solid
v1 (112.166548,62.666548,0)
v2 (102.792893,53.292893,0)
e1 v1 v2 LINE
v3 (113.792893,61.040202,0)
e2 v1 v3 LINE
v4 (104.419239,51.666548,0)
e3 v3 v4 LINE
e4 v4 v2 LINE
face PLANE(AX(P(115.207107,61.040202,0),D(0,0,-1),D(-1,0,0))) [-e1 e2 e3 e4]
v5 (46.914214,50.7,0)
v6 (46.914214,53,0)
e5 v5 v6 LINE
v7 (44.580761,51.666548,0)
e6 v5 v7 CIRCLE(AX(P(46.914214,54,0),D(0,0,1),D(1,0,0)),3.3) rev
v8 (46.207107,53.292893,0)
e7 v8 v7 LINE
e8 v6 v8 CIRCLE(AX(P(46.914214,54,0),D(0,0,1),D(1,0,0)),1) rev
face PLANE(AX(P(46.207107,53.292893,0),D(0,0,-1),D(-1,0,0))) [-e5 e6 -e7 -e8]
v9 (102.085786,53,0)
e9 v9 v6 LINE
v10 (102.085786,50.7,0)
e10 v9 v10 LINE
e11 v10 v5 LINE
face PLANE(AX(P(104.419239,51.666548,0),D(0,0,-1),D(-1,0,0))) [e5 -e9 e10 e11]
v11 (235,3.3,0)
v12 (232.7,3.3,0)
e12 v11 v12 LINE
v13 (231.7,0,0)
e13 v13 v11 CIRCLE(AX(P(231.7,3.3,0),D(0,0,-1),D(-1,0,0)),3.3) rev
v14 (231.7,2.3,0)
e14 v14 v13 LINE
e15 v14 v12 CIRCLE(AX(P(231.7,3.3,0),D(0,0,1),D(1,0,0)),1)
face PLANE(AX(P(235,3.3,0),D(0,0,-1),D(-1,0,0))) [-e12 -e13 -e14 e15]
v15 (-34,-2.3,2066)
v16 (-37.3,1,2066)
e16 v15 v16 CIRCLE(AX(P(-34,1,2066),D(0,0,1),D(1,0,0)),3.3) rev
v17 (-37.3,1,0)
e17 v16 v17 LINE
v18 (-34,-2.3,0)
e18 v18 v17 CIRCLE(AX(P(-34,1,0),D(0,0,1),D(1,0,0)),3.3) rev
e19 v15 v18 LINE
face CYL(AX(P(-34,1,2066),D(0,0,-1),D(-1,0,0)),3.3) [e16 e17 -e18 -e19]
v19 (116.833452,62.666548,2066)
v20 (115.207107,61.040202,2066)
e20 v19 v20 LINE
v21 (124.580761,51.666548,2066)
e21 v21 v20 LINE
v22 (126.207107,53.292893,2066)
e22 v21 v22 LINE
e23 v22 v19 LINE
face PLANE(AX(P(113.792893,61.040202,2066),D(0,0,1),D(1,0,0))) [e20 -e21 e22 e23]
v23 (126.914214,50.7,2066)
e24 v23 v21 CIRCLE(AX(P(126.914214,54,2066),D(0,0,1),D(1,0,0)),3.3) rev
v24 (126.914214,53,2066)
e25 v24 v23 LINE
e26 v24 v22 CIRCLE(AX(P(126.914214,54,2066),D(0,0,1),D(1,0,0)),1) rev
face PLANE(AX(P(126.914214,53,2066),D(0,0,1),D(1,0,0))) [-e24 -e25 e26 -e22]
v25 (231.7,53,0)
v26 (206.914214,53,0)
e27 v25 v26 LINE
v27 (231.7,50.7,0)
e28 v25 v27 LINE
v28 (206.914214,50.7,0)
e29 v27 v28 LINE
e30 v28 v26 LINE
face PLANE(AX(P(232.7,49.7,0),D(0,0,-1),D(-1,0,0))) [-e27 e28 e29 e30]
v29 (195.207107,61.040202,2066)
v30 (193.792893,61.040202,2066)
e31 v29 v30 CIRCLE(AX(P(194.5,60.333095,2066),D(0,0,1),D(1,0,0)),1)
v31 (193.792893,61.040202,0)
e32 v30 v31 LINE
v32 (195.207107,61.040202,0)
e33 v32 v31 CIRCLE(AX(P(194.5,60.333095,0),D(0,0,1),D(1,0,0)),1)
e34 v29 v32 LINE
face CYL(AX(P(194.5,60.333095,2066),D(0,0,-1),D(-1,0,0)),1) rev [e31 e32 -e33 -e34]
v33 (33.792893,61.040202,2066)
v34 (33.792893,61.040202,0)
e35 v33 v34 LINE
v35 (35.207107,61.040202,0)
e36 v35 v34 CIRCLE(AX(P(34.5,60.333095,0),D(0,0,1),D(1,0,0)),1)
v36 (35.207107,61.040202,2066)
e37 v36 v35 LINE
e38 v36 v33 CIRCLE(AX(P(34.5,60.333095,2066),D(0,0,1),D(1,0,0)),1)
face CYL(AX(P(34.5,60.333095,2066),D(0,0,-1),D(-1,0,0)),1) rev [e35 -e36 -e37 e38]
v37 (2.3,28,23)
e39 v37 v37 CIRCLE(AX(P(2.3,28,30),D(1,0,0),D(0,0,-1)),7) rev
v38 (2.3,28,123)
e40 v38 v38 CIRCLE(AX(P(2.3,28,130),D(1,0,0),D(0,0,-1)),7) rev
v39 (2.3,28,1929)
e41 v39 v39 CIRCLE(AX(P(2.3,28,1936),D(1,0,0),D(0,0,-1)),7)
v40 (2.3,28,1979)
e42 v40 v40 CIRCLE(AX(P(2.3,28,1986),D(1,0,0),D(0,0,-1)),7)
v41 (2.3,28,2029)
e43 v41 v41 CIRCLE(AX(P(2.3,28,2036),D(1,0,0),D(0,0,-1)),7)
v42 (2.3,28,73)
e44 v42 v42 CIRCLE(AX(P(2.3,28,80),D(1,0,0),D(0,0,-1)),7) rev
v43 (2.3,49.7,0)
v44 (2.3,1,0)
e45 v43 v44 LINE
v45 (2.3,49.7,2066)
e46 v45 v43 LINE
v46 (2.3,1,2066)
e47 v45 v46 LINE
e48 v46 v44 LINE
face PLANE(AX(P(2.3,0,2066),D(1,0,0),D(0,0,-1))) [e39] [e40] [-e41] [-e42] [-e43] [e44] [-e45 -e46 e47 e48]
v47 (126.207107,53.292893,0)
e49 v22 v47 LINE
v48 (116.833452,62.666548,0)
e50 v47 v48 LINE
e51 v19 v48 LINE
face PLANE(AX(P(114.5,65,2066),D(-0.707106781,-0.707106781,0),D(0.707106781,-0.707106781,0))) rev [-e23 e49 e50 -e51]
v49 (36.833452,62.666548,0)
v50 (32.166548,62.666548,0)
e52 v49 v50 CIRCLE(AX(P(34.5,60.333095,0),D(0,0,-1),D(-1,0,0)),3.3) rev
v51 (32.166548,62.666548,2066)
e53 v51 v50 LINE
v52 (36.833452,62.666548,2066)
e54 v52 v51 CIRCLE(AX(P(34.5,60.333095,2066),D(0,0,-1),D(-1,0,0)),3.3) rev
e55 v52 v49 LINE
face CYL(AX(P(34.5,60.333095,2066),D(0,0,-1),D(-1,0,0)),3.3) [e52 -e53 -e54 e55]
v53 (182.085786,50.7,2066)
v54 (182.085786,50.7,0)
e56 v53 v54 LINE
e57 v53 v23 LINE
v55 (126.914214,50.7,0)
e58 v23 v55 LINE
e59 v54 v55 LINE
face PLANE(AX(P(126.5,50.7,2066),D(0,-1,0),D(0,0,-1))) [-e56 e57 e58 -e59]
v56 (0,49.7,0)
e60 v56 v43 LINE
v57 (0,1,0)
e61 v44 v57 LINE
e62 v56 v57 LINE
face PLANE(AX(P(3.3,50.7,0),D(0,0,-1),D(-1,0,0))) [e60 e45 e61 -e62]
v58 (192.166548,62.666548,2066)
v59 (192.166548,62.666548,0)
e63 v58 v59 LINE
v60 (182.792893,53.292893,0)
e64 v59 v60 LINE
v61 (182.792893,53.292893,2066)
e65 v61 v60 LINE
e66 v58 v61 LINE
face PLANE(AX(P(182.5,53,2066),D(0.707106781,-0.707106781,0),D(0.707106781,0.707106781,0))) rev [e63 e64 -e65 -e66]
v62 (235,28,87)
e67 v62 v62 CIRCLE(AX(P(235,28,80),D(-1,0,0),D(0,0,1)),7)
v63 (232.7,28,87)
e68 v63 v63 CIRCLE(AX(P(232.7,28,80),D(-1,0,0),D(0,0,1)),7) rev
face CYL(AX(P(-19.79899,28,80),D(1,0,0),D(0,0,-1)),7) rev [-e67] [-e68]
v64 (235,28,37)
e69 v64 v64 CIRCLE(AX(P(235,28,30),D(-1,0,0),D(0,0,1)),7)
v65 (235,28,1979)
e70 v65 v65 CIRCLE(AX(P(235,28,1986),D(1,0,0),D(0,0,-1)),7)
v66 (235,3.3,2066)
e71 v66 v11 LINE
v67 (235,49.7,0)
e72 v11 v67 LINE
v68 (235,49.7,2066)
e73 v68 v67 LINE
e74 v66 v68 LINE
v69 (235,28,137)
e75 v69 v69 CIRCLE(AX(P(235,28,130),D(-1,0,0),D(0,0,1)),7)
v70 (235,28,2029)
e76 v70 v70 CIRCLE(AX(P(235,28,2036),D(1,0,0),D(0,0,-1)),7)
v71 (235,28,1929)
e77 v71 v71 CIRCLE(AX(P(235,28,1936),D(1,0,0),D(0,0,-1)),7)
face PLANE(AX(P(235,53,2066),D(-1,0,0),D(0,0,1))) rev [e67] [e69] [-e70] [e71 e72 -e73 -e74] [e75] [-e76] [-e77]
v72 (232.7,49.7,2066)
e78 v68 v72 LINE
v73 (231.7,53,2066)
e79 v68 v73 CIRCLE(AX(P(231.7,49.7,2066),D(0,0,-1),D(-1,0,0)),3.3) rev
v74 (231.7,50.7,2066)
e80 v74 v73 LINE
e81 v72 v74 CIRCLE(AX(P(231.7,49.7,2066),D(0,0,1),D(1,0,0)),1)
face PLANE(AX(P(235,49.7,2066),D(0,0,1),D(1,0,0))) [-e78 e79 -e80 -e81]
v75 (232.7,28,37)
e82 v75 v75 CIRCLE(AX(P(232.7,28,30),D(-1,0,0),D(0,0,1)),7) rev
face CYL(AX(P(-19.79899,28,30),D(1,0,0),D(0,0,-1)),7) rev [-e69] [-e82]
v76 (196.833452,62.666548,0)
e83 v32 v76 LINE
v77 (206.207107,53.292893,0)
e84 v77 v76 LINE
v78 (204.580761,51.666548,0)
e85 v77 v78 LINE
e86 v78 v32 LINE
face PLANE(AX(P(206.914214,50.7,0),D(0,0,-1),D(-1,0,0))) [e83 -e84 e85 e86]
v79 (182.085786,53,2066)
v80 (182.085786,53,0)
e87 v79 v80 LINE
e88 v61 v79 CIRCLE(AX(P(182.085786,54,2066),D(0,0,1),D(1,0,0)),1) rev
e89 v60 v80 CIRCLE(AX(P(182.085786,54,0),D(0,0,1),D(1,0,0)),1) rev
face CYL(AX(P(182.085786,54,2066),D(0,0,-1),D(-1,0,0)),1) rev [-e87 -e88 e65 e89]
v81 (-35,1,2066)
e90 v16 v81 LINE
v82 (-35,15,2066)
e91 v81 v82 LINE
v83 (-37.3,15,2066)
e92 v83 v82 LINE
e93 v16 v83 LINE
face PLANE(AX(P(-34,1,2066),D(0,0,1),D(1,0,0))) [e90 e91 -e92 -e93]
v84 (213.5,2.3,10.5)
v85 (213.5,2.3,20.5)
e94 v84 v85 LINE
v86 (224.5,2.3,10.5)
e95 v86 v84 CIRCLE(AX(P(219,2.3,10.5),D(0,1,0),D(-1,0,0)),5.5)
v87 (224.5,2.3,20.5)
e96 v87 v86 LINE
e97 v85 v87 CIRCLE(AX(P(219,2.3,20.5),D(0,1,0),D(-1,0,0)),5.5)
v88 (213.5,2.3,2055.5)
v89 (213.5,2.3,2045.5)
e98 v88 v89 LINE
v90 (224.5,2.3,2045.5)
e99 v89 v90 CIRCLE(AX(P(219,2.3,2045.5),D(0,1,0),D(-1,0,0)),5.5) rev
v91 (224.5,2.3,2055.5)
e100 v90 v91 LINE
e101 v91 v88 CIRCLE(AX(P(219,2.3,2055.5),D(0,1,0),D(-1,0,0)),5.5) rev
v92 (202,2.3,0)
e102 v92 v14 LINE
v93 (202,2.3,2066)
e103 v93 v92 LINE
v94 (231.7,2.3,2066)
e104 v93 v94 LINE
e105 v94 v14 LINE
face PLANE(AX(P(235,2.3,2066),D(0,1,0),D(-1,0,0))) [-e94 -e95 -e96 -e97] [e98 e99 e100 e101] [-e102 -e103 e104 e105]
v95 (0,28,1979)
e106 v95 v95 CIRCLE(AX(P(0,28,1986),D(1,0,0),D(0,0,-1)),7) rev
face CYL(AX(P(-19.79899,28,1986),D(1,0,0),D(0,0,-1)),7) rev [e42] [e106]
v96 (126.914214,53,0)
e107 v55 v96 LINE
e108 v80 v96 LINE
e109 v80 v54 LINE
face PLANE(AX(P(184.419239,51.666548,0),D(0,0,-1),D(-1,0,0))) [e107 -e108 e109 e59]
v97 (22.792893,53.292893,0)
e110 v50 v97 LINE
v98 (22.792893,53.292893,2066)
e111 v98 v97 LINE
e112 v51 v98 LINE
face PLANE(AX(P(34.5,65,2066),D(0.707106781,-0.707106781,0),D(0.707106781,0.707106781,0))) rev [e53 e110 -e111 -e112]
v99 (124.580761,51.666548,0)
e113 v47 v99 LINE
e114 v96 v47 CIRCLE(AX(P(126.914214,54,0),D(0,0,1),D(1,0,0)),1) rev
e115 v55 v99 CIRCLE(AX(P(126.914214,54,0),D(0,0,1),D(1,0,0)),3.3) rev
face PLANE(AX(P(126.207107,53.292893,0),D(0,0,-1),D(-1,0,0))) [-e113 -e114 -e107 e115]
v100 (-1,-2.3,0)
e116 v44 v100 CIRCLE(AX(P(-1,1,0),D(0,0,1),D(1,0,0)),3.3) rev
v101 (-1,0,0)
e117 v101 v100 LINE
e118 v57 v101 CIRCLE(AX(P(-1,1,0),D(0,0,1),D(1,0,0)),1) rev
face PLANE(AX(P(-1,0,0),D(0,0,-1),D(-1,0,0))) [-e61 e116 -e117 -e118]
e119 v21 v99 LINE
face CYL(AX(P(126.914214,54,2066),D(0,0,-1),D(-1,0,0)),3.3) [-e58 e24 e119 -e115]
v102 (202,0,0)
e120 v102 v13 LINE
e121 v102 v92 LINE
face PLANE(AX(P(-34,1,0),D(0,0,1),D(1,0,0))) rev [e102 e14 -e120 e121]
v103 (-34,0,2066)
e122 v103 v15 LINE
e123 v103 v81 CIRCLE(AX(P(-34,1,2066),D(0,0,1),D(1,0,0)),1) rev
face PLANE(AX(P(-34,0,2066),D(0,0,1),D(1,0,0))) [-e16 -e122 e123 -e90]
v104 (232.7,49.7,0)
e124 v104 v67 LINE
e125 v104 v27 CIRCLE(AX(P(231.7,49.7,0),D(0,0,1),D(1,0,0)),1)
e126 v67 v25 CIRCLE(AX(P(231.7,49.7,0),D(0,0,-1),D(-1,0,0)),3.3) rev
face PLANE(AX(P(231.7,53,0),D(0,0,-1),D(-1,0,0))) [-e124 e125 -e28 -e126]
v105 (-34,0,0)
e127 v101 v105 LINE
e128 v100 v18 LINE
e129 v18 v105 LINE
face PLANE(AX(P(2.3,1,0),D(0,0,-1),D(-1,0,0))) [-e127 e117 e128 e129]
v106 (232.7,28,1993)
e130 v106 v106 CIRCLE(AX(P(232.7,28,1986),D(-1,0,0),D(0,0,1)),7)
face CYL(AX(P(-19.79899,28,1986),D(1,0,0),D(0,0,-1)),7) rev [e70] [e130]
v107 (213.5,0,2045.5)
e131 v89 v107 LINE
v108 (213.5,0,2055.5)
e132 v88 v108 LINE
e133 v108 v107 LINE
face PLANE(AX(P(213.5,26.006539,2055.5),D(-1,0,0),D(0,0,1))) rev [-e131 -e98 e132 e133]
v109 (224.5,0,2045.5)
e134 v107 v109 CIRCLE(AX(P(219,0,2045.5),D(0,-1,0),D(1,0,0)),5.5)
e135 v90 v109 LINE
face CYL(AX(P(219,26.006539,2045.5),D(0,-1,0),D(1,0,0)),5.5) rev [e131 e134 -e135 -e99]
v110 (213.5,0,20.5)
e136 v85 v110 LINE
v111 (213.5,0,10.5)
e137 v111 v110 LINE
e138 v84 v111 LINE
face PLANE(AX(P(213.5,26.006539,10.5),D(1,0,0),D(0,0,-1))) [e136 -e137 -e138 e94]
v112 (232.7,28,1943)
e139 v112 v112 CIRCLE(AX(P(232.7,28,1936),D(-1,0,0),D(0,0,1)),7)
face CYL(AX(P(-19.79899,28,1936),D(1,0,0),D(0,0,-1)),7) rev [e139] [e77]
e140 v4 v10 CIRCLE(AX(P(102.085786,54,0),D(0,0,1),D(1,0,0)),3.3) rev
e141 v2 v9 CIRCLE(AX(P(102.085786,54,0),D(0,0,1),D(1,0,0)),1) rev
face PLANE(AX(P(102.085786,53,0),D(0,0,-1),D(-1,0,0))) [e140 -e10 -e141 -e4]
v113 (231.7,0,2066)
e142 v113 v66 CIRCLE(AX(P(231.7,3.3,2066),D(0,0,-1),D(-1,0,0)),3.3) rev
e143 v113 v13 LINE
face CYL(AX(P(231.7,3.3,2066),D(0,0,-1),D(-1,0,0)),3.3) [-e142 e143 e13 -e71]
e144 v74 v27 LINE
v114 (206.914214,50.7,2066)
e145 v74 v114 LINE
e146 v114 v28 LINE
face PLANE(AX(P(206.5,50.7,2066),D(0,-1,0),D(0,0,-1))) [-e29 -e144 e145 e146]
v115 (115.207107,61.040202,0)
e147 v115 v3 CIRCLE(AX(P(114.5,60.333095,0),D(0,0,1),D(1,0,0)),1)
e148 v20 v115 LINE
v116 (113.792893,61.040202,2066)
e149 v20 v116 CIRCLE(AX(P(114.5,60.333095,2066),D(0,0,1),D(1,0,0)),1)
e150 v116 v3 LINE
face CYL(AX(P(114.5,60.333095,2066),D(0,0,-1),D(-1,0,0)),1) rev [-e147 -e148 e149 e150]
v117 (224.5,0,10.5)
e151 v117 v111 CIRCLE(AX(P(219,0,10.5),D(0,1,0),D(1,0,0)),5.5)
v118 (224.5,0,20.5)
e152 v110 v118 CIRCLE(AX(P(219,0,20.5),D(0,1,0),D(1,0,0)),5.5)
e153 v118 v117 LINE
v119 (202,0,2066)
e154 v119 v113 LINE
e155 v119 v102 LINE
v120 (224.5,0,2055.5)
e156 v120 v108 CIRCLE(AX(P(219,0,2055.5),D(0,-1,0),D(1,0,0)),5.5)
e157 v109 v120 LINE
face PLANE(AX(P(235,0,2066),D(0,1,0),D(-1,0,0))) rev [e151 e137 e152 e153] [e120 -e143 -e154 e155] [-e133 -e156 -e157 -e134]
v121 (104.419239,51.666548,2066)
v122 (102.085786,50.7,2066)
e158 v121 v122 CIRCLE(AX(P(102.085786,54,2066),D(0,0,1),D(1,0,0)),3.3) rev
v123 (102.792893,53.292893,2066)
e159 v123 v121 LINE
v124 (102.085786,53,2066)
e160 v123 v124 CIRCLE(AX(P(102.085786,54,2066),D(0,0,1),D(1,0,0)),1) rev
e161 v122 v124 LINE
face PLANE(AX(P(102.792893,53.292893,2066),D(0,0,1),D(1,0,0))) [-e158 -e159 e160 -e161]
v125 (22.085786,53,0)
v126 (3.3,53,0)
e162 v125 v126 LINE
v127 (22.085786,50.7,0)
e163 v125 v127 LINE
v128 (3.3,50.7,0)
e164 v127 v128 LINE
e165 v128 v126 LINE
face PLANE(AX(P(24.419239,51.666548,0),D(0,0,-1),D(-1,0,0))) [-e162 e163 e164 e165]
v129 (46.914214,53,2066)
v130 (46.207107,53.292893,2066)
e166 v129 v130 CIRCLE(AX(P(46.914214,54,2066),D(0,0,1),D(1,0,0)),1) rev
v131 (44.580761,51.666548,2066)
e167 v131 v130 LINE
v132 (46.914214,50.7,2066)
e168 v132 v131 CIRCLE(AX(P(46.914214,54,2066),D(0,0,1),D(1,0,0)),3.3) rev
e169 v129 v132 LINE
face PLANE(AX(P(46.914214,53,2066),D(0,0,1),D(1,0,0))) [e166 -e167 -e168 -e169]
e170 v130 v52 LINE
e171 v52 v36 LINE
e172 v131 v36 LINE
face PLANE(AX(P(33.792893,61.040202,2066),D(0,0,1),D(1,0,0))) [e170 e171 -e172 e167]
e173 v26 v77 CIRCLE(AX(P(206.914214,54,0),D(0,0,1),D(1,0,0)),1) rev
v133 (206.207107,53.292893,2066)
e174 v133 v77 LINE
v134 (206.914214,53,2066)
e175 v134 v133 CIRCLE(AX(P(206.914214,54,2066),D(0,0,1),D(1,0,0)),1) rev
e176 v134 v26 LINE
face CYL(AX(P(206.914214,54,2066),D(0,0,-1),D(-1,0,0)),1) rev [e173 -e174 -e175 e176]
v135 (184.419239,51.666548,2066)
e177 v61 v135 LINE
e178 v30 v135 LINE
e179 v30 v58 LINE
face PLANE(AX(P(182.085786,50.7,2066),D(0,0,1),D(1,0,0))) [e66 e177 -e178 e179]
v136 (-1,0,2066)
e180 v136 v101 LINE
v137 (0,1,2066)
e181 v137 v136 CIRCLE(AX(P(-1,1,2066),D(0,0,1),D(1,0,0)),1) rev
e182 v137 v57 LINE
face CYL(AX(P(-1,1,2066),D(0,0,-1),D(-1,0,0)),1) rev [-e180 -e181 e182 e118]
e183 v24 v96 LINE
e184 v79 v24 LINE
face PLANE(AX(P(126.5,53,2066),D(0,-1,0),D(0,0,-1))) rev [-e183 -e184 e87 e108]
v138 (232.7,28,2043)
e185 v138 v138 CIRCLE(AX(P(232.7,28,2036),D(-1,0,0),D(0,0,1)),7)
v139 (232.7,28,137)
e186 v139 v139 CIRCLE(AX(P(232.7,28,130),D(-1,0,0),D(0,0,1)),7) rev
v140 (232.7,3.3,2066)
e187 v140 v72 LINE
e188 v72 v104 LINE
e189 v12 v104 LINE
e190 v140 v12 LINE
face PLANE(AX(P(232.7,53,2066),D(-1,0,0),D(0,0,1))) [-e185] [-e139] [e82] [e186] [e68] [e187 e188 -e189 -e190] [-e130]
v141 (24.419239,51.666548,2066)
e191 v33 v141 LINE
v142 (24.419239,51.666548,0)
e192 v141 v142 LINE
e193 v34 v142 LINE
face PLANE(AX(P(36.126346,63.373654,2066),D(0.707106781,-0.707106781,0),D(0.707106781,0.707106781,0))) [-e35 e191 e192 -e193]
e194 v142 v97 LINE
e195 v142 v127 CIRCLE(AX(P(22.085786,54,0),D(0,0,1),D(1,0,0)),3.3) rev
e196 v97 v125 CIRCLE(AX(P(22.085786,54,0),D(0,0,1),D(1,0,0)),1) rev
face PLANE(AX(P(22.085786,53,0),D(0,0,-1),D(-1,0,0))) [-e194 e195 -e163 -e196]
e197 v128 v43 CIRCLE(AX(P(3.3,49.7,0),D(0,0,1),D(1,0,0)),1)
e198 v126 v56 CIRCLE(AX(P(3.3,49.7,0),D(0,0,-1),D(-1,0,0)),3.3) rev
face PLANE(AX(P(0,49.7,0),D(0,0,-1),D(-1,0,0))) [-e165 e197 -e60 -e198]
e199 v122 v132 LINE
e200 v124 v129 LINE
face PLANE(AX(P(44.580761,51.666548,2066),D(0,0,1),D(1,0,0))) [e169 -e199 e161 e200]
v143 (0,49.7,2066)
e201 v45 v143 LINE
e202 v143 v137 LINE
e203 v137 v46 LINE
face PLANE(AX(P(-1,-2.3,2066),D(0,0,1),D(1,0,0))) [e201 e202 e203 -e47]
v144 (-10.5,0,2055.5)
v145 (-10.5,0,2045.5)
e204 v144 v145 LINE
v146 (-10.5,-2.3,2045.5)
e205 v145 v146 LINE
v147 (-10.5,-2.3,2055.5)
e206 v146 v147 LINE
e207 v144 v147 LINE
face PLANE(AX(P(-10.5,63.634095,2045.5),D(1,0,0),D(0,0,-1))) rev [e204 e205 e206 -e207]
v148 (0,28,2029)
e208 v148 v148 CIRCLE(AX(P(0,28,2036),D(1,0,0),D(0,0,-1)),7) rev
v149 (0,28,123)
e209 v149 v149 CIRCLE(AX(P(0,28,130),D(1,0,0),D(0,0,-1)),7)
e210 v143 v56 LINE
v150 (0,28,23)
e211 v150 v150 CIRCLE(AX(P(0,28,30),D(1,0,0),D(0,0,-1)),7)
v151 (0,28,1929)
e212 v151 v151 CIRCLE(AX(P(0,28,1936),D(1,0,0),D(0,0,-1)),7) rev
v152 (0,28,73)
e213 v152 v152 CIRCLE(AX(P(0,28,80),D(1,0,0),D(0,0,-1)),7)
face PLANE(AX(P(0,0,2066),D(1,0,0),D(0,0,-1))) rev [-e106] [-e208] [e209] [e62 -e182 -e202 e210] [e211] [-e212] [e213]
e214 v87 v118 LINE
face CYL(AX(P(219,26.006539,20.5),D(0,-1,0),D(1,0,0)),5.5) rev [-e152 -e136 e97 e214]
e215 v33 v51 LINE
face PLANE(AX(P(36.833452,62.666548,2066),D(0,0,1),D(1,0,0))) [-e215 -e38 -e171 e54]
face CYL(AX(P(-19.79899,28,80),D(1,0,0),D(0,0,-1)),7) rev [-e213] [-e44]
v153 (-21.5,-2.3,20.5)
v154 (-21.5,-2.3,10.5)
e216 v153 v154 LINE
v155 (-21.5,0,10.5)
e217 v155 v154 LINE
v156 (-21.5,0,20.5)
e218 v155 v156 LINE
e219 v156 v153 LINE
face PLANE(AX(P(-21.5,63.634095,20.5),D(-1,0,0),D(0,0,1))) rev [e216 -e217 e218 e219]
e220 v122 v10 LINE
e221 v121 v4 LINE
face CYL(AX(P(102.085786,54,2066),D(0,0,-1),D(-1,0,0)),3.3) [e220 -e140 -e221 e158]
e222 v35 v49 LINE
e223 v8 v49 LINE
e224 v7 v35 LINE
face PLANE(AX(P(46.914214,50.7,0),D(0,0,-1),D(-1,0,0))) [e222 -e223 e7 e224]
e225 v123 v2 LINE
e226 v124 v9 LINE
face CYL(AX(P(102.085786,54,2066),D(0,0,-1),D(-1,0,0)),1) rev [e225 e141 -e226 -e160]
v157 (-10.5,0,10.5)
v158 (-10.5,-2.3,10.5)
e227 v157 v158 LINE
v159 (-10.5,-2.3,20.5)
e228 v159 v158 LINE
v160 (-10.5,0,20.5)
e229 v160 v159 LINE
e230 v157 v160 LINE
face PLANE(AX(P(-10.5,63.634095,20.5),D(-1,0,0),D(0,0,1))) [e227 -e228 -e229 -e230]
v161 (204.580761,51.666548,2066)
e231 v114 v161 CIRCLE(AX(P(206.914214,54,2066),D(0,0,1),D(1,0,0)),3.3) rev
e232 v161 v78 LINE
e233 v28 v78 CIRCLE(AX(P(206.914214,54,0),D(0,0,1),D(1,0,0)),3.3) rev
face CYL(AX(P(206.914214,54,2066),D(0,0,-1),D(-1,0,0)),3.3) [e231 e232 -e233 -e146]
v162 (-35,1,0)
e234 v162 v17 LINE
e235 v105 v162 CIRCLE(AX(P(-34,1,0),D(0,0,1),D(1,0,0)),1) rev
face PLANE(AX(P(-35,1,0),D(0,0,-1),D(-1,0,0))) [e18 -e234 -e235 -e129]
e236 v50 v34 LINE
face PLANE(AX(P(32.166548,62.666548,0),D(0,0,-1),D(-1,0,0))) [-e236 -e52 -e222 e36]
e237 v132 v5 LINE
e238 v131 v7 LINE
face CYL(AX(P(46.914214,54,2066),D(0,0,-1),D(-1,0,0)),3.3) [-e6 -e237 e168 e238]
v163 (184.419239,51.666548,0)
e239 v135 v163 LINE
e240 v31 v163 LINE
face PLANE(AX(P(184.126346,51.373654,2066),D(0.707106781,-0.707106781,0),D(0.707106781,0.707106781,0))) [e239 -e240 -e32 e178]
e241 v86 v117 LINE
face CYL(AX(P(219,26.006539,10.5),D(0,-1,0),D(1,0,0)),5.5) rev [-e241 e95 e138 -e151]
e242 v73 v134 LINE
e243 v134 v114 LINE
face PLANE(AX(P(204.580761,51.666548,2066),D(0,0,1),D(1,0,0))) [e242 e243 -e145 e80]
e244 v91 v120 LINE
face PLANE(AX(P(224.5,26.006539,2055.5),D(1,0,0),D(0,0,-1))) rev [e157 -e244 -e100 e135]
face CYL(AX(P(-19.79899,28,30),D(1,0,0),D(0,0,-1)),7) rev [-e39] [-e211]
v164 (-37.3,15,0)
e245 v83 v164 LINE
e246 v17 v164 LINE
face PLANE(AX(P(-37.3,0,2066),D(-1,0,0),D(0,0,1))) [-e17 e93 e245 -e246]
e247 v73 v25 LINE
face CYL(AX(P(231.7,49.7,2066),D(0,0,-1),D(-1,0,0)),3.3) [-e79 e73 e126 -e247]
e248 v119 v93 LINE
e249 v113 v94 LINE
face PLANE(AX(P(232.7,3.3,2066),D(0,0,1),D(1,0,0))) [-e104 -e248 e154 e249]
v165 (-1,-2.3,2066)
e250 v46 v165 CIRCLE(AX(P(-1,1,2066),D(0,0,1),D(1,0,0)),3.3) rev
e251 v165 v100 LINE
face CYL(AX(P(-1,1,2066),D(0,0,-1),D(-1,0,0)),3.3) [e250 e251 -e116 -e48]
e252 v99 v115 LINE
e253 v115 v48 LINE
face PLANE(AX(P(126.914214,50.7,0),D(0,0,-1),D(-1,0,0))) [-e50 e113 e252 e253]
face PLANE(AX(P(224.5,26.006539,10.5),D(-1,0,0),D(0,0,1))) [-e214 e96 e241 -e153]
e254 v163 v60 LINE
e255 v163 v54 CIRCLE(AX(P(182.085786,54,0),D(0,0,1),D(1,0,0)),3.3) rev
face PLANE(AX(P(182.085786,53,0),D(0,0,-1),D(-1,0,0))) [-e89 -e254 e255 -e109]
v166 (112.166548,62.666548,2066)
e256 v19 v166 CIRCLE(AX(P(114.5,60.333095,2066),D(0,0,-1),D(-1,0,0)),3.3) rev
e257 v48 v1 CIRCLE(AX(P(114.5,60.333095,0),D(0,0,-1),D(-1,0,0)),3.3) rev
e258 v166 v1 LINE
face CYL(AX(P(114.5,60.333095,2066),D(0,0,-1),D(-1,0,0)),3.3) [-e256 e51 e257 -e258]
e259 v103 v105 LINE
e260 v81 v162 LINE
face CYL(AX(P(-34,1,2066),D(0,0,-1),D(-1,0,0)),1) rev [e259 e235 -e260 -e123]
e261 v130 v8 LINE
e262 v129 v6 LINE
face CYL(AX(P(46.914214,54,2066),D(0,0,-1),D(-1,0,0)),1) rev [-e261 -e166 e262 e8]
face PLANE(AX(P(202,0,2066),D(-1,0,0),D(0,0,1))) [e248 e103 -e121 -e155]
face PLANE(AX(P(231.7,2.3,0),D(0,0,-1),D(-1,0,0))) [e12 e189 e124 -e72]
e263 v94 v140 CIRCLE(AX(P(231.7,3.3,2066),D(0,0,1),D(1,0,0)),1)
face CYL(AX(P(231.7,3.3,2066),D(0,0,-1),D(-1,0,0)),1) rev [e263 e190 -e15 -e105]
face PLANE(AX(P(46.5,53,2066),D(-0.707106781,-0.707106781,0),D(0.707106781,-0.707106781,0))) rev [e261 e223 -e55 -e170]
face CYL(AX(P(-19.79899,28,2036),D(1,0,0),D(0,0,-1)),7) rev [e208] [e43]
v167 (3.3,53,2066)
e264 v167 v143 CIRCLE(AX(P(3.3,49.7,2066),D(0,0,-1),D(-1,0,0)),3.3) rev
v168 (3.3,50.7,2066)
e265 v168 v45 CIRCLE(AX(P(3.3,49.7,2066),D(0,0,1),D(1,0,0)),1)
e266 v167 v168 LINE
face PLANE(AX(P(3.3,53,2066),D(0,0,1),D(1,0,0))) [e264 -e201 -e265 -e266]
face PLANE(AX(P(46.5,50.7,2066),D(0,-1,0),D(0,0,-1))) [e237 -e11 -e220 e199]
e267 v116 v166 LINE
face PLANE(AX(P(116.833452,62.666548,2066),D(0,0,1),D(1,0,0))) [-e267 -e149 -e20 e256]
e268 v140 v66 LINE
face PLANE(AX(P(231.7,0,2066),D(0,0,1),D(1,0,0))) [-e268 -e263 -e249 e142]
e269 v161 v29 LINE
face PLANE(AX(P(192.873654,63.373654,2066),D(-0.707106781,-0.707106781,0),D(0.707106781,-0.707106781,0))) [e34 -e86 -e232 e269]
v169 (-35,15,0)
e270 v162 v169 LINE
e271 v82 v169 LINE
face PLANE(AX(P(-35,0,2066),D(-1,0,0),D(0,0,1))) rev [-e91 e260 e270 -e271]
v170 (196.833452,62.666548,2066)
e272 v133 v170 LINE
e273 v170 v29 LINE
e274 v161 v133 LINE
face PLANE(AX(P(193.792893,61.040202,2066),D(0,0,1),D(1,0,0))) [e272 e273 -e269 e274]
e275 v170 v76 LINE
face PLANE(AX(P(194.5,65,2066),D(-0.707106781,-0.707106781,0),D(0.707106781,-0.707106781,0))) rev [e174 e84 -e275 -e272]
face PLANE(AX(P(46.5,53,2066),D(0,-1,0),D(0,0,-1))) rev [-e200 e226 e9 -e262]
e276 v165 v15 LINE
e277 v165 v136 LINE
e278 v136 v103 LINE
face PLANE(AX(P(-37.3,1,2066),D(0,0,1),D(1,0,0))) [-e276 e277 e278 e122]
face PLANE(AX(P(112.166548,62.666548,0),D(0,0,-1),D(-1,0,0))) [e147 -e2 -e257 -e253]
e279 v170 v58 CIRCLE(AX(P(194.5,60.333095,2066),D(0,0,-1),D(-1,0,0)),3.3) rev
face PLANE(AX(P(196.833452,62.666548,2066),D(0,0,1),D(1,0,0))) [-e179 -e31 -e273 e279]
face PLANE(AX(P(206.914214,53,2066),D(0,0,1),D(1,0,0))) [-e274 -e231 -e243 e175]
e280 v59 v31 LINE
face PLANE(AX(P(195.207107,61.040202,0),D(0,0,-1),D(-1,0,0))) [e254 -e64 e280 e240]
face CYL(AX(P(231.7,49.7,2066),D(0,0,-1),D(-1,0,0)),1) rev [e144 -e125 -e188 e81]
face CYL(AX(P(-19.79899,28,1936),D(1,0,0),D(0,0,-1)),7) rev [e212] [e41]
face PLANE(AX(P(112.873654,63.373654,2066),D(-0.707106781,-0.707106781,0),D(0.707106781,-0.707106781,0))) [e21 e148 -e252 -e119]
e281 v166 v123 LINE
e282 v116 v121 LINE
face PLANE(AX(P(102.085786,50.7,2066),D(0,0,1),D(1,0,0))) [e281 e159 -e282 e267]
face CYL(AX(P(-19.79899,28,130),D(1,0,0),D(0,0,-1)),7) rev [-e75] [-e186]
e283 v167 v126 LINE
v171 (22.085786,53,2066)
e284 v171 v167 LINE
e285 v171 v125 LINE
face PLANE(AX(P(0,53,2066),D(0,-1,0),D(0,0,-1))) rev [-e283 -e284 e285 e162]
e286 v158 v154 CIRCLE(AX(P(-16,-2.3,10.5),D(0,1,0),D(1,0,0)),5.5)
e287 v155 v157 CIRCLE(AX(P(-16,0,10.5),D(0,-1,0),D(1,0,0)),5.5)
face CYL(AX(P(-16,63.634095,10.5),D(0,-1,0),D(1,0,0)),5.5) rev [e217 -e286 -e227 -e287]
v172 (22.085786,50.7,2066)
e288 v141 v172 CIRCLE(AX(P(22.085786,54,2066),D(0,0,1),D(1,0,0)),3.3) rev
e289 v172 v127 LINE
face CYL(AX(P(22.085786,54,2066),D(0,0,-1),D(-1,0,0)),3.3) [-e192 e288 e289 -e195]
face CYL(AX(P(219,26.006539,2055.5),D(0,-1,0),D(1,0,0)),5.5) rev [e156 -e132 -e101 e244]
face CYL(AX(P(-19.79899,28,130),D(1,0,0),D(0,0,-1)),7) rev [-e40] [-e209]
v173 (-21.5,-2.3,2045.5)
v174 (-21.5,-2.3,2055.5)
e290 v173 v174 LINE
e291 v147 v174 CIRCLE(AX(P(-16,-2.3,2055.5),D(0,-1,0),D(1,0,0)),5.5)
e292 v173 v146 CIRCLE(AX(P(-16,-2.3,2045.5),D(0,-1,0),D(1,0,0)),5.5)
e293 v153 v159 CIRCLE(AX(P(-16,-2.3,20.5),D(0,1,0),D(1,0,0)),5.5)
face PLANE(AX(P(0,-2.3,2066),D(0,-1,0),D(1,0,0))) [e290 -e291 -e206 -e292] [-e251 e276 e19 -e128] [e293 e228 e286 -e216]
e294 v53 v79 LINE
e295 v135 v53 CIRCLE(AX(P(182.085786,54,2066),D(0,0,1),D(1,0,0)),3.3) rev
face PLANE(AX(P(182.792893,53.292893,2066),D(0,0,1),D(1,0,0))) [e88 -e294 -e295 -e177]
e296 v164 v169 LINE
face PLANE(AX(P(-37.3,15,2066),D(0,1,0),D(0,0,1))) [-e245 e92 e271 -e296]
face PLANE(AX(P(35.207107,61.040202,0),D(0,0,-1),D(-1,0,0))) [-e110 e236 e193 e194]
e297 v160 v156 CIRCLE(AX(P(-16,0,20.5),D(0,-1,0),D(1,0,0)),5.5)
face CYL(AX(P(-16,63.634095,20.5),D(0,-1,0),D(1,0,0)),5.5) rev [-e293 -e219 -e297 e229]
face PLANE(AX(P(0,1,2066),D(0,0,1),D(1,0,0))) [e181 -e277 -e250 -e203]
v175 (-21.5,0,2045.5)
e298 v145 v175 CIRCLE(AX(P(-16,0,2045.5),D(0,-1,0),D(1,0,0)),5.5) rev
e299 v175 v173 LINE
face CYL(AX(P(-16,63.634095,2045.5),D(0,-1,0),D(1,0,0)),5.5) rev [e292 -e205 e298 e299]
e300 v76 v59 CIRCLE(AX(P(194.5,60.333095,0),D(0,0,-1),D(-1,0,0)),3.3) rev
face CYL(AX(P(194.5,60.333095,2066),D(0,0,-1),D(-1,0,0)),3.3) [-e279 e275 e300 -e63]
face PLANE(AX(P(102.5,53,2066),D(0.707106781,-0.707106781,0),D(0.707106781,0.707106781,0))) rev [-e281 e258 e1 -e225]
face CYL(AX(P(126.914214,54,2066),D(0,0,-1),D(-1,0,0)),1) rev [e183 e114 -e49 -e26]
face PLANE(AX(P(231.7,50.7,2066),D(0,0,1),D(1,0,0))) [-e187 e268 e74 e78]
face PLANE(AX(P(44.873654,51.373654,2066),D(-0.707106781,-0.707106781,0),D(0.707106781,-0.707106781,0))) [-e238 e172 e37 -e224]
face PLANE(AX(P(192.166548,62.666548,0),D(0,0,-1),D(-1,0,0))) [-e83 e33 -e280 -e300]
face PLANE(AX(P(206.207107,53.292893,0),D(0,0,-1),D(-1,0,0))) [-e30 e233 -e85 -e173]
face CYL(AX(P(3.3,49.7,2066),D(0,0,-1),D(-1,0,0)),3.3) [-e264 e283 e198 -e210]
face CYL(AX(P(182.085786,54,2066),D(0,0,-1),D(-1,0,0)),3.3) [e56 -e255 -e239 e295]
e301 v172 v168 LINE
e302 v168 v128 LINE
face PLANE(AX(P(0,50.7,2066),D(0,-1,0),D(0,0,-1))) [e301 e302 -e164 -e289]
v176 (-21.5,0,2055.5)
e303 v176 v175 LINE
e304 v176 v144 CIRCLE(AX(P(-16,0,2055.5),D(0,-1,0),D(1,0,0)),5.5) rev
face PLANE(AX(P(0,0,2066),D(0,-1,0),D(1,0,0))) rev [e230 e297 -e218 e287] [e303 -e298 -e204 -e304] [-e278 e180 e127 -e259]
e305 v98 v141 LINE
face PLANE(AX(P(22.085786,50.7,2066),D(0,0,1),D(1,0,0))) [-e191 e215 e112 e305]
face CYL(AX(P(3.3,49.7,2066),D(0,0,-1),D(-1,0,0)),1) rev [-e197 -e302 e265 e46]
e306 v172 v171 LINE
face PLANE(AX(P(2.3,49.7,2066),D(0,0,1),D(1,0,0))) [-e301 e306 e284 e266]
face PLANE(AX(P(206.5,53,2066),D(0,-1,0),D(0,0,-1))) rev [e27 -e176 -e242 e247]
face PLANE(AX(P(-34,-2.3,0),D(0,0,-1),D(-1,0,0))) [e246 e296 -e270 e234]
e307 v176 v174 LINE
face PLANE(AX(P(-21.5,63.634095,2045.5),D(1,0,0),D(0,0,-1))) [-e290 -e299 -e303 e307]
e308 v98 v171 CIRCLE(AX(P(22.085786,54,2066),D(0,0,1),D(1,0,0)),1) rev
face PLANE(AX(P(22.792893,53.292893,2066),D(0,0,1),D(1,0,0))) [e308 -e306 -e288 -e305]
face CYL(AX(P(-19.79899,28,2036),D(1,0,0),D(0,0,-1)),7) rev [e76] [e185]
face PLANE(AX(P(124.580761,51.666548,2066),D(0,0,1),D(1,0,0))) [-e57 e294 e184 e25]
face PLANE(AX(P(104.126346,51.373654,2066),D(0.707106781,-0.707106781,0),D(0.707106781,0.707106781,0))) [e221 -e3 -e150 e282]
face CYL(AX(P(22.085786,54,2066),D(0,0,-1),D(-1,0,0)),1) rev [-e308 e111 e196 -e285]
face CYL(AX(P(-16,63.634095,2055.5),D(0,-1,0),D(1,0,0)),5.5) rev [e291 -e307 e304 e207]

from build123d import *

# Parameters (mm, degrees)
SM_BASE_FLANGE_1_DEPTH = 2066
CUT_EXTRUDE_2_DEPTH    = 2.3
CUT_EXTRUDE_3_REACH    = 2082.367
CUT_EXTRUDE_4_REACH    = 2086.839
SKETCH_8_R             = 7


# Sheet-metal steps are written as plain solids
with BuildPart() as part:
    # Sketch 1 → 基体-法兰1 (new body)
    with BuildSketch(Plane.XY):
        with BuildLine():
            Line((-35, 15), (-35, 1))
            ThreePointArc((-35, 1), (-34.707106781, 0.292893219), (-34, 0))
            Line((-34, 0), (-1, 0))
            ThreePointArc((-1, 0), (-0.292893219, 0.292893219), (0, 1))
            Line((0, 1), (0, 49.7))
            ThreePointArc((0, 49.7), (0.966547622, 52.033452378), (3.3, 53))
            Line((3.3, 53), (22.085786438, 53))
            ThreePointArc((22.085786438, 53), (22.46846987, 53.076120467), (22.792893219, 53.292893219))
            Line((22.792893219, 53.292893219), (32.166547622, 62.666547622))
            ThreePointArc((32.166547622, 62.666547622), (34.5, 63.633095244), (36.833452378, 62.666547622))
            Line((36.833452378, 62.666547622), (46.207106781, 53.292893219))
            ThreePointArc((46.207106781, 53.292893219), (46.53153013, 53.076120467), (46.914213562, 53))
            Line((46.914213562, 53), (102.085786438, 53))
            ThreePointArc((102.085786438, 53), (102.46846987, 53.076120467), (102.792893219, 53.292893219))
            Line((102.792893219, 53.292893219), (112.166547622, 62.666547622))
            ThreePointArc((112.166547622, 62.666547622), (114.5, 63.633095244), (116.833452378, 62.666547622))
            Line((116.833452378, 62.666547622), (126.207106781, 53.292893219))
            ThreePointArc((126.207106781, 53.292893219), (126.53153013, 53.076120467), (126.914213562, 53))
            Line((126.914213562, 53), (182.085786438, 53))
            ThreePointArc((182.085786438, 53), (182.46846987, 53.076120467), (182.792893219, 53.292893219))
            Line((182.792893219, 53.292893219), (192.166547622, 62.666547622))
            ThreePointArc((192.166547622, 62.666547622), (194.5, 63.633095244), (196.833452378, 62.666547622))
            Line((196.833452378, 62.666547622), (206.207106781, 53.292893219))
            ThreePointArc((206.207106781, 53.292893219), (206.53153013, 53.076120467), (206.914213562, 53))
            Line((206.914213562, 53), (231.7, 53))
            ThreePointArc((231.7, 53), (234.033452378, 52.033452378), (235, 49.7))
            Line((235, 49.7), (235, 3.3))
            ThreePointArc((235, 3.3), (234.033452378, 0.966547622), (231.7, 0))
            Line((231.7, 0), (202, 0))
            Line((202, 0), (202, 2.3))
            Line((202, 2.3), (231.7, 2.3))
            ThreePointArc((231.7, 2.3), (232.407106781, 2.592893219), (232.7, 3.3))
            Line((232.7, 3.3), (232.7, 49.7))
            ThreePointArc((232.7, 49.7), (232.407106781, 50.407106781), (231.7, 50.7))
            Line((231.7, 50.7), (206.914213562, 50.7))
            ThreePointArc((206.914213562, 50.7), (205.651358236, 50.951197543), (204.580761184, 51.666547622))
            Line((204.580761184, 51.666547622), (195.207106781, 61.040202025))
            ThreePointArc((195.207106781, 61.040202025), (194.5, 61.333095244), (193.792893219, 61.040202025))
            Line((193.792893219, 61.040202025), (184.419238816, 51.666547622))
            ThreePointArc((184.419238816, 51.666547622), (183.348641764, 50.951197543), (182.085786438, 50.7))
            Line((182.085786438, 50.7), (126.914213562, 50.7))
            ThreePointArc((126.914213562, 50.7), (125.651358236, 50.951197543), (124.580761184, 51.666547622))
            Line((124.580761184, 51.666547622), (115.207106781, 61.040202025))
            ThreePointArc((115.207106781, 61.040202025), (114.5, 61.333095244), (113.792893219, 61.040202025))
            Line((113.792893219, 61.040202025), (104.419238816, 51.666547622))
            ThreePointArc((104.419238816, 51.666547622), (103.348641764, 50.951197543), (102.085786438, 50.7))
            Line((102.085786438, 50.7), (46.914213562, 50.7))
            ThreePointArc((46.914213562, 50.7), (45.651358236, 50.951197543), (44.580761184, 51.666547622))
            Line((44.580761184, 51.666547622), (35.207106781, 61.040202025))
            ThreePointArc((35.207106781, 61.040202025), (34.5, 61.333095244), (33.792893219, 61.040202025))
            Line((33.792893219, 61.040202025), (24.419238816, 51.666547622))
            ThreePointArc((24.419238816, 51.666547622), (23.348641764, 50.951197543), (22.085786438, 50.7))
            Line((22.085786438, 50.7), (3.3, 50.7))
            ThreePointArc((3.3, 50.7), (2.592893219, 50.407106781), (2.3, 49.7))
            Line((2.3, 49.7), (2.3, 1))
            ThreePointArc((2.3, 1), (1.333452378, -1.333452378), (-1, -2.3))
            Line((-1, -2.3), (-34, -2.3))
            ThreePointArc((-34, -2.3), (-36.333452378, -1.333452378), (-37.3, 1))
            Line((-37.3, 1), (-37.3, 15))
            Line((-37.3, 15), (-35, 15))
        make_face()
    extrude(amount=SM_BASE_FLANGE_1_DEPTH)

    # 草图6 → 切除-拉伸2 (cut)
    with BuildSketch(Plane.XZ):
        with BuildLine():
            Line((213.5, 2055.5), (213.5, 2045.5))
            ThreePointArc((213.5, 2045.5), (219, 2040), (224.5, 2045.5))
            Line((224.5, 2045.5), (224.5, 2055.5))
            ThreePointArc((224.5, 2055.5), (219, 2061), (213.5, 2055.5))
        make_face()
    cut_extrude_2 = extrude(amount=-CUT_EXTRUDE_2_DEPTH, mode=Mode.SUBTRACT)

    # 草图7 → 切除-拉伸3 (cut, up to next)
    with BuildSketch(Plane.XZ.offset(2.3), mode=Mode.PRIVATE) as cut_extrude_3_sk1:
        with BuildLine():
            Line((-10.5, 2045.5), (-10.5, 2055.5))
            ThreePointArc((-10.5, 2055.5), (-16, 2061), (-21.5, 2055.5))
            Line((-21.5, 2055.5), (-21.5, 2045.5))
            ThreePointArc((-21.5, 2045.5), (-16, 2040), (-10.5, 2045.5))
        make_face()
    cut_extrude_3_tool1 = extrude(cut_extrude_3_sk1.sketch, amount=-CUT_EXTRUDE_3_REACH, mode=Mode.PRIVATE) & part.part
    cut_extrude_3 = cut_extrude_3_tool1.solids().sort_by_distance((-16, -2.3, 2050.5))[0]
    add(cut_extrude_3, mode=Mode.SUBTRACT)

    # 镜向1: 切除-拉伸2, 切除-拉伸3 across plane
    add(cut_extrude_2.mirror(Plane.XY.offset(1033)), mode=Mode.SUBTRACT)
    add(cut_extrude_3.mirror(Plane.XY.offset(1033)), mode=Mode.SUBTRACT)

    # 切除-拉伸4: up to this face of the body (flat: up to its plane)
    cut_extrude_4_end = Plane(part.part.faces().sort_by_distance((0, 25.35, 1033))[0])
    # 草图8 → 切除-拉伸4 (cut, up to the picked face)
    with BuildSketch(Plane(origin=(235, 0, 0), x_dir=(0, 0, -1), z_dir=(1, 0, 0)), mode=Mode.PRIVATE) as cut_extrude_4_sk1:
        with Locations((-2036, 28)):
            Circle(SKETCH_8_R)
    cut_extrude_4_tool1 = split(extrude(cut_extrude_4_sk1.sketch, amount=-CUT_EXTRUDE_4_REACH, mode=Mode.PRIVATE), bisect_by=cut_extrude_4_end, keep=Keep.BOTH, mode=Mode.PRIVATE)
    # 草图8 → 切除-拉伸4 (cut, up to the picked face)
    with BuildSketch(Plane(origin=(235, 0, 0), x_dir=(0, 0, -1), z_dir=(1, 0, 0)), mode=Mode.PRIVATE) as cut_extrude_4_sk2:
        with Locations((-1986, 28)):
            Circle(SKETCH_8_R)
    cut_extrude_4_tool2 = split(extrude(cut_extrude_4_sk2.sketch, amount=-CUT_EXTRUDE_4_REACH, mode=Mode.PRIVATE), bisect_by=cut_extrude_4_end, keep=Keep.BOTH, mode=Mode.PRIVATE)
    # 草图8 → 切除-拉伸4 (cut, up to the picked face)
    with BuildSketch(Plane(origin=(235, 0, 0), x_dir=(0, 0, -1), z_dir=(1, 0, 0)), mode=Mode.PRIVATE) as cut_extrude_4_sk3:
        with Locations((-1936, 28)):
            Circle(SKETCH_8_R)
    cut_extrude_4_tool3 = split(extrude(cut_extrude_4_sk3.sketch, amount=-CUT_EXTRUDE_4_REACH, mode=Mode.PRIVATE), bisect_by=cut_extrude_4_end, keep=Keep.BOTH, mode=Mode.PRIVATE)
    cut_extrude_4_1 = cut_extrude_4_tool1.solids().sort_by(Axis((235, 28, 2036), (-1, 0, 0)))[0]
    add(cut_extrude_4_1, mode=Mode.SUBTRACT)
    cut_extrude_4_2 = cut_extrude_4_tool2.solids().sort_by(Axis((235, 28, 1986), (-1, 0, 0)))[0]
    add(cut_extrude_4_2, mode=Mode.SUBTRACT)
    cut_extrude_4_3 = cut_extrude_4_tool3.solids().sort_by(Axis((235, 28, 1936), (-1, 0, 0)))[0]
    add(cut_extrude_4_3, mode=Mode.SUBTRACT)
    cut_extrude_4 = cut_extrude_4_1 + cut_extrude_4_2 + cut_extrude_4_3  # 切除-拉伸4 as one shape, for the pattern or mirror that repeats it

    # 镜向2: 切除-拉伸4 across plane
    add(cut_extrude_4.mirror(Plane.XY.offset(1033)), mode=Mode.SUBTRACT)


solid = part.part
